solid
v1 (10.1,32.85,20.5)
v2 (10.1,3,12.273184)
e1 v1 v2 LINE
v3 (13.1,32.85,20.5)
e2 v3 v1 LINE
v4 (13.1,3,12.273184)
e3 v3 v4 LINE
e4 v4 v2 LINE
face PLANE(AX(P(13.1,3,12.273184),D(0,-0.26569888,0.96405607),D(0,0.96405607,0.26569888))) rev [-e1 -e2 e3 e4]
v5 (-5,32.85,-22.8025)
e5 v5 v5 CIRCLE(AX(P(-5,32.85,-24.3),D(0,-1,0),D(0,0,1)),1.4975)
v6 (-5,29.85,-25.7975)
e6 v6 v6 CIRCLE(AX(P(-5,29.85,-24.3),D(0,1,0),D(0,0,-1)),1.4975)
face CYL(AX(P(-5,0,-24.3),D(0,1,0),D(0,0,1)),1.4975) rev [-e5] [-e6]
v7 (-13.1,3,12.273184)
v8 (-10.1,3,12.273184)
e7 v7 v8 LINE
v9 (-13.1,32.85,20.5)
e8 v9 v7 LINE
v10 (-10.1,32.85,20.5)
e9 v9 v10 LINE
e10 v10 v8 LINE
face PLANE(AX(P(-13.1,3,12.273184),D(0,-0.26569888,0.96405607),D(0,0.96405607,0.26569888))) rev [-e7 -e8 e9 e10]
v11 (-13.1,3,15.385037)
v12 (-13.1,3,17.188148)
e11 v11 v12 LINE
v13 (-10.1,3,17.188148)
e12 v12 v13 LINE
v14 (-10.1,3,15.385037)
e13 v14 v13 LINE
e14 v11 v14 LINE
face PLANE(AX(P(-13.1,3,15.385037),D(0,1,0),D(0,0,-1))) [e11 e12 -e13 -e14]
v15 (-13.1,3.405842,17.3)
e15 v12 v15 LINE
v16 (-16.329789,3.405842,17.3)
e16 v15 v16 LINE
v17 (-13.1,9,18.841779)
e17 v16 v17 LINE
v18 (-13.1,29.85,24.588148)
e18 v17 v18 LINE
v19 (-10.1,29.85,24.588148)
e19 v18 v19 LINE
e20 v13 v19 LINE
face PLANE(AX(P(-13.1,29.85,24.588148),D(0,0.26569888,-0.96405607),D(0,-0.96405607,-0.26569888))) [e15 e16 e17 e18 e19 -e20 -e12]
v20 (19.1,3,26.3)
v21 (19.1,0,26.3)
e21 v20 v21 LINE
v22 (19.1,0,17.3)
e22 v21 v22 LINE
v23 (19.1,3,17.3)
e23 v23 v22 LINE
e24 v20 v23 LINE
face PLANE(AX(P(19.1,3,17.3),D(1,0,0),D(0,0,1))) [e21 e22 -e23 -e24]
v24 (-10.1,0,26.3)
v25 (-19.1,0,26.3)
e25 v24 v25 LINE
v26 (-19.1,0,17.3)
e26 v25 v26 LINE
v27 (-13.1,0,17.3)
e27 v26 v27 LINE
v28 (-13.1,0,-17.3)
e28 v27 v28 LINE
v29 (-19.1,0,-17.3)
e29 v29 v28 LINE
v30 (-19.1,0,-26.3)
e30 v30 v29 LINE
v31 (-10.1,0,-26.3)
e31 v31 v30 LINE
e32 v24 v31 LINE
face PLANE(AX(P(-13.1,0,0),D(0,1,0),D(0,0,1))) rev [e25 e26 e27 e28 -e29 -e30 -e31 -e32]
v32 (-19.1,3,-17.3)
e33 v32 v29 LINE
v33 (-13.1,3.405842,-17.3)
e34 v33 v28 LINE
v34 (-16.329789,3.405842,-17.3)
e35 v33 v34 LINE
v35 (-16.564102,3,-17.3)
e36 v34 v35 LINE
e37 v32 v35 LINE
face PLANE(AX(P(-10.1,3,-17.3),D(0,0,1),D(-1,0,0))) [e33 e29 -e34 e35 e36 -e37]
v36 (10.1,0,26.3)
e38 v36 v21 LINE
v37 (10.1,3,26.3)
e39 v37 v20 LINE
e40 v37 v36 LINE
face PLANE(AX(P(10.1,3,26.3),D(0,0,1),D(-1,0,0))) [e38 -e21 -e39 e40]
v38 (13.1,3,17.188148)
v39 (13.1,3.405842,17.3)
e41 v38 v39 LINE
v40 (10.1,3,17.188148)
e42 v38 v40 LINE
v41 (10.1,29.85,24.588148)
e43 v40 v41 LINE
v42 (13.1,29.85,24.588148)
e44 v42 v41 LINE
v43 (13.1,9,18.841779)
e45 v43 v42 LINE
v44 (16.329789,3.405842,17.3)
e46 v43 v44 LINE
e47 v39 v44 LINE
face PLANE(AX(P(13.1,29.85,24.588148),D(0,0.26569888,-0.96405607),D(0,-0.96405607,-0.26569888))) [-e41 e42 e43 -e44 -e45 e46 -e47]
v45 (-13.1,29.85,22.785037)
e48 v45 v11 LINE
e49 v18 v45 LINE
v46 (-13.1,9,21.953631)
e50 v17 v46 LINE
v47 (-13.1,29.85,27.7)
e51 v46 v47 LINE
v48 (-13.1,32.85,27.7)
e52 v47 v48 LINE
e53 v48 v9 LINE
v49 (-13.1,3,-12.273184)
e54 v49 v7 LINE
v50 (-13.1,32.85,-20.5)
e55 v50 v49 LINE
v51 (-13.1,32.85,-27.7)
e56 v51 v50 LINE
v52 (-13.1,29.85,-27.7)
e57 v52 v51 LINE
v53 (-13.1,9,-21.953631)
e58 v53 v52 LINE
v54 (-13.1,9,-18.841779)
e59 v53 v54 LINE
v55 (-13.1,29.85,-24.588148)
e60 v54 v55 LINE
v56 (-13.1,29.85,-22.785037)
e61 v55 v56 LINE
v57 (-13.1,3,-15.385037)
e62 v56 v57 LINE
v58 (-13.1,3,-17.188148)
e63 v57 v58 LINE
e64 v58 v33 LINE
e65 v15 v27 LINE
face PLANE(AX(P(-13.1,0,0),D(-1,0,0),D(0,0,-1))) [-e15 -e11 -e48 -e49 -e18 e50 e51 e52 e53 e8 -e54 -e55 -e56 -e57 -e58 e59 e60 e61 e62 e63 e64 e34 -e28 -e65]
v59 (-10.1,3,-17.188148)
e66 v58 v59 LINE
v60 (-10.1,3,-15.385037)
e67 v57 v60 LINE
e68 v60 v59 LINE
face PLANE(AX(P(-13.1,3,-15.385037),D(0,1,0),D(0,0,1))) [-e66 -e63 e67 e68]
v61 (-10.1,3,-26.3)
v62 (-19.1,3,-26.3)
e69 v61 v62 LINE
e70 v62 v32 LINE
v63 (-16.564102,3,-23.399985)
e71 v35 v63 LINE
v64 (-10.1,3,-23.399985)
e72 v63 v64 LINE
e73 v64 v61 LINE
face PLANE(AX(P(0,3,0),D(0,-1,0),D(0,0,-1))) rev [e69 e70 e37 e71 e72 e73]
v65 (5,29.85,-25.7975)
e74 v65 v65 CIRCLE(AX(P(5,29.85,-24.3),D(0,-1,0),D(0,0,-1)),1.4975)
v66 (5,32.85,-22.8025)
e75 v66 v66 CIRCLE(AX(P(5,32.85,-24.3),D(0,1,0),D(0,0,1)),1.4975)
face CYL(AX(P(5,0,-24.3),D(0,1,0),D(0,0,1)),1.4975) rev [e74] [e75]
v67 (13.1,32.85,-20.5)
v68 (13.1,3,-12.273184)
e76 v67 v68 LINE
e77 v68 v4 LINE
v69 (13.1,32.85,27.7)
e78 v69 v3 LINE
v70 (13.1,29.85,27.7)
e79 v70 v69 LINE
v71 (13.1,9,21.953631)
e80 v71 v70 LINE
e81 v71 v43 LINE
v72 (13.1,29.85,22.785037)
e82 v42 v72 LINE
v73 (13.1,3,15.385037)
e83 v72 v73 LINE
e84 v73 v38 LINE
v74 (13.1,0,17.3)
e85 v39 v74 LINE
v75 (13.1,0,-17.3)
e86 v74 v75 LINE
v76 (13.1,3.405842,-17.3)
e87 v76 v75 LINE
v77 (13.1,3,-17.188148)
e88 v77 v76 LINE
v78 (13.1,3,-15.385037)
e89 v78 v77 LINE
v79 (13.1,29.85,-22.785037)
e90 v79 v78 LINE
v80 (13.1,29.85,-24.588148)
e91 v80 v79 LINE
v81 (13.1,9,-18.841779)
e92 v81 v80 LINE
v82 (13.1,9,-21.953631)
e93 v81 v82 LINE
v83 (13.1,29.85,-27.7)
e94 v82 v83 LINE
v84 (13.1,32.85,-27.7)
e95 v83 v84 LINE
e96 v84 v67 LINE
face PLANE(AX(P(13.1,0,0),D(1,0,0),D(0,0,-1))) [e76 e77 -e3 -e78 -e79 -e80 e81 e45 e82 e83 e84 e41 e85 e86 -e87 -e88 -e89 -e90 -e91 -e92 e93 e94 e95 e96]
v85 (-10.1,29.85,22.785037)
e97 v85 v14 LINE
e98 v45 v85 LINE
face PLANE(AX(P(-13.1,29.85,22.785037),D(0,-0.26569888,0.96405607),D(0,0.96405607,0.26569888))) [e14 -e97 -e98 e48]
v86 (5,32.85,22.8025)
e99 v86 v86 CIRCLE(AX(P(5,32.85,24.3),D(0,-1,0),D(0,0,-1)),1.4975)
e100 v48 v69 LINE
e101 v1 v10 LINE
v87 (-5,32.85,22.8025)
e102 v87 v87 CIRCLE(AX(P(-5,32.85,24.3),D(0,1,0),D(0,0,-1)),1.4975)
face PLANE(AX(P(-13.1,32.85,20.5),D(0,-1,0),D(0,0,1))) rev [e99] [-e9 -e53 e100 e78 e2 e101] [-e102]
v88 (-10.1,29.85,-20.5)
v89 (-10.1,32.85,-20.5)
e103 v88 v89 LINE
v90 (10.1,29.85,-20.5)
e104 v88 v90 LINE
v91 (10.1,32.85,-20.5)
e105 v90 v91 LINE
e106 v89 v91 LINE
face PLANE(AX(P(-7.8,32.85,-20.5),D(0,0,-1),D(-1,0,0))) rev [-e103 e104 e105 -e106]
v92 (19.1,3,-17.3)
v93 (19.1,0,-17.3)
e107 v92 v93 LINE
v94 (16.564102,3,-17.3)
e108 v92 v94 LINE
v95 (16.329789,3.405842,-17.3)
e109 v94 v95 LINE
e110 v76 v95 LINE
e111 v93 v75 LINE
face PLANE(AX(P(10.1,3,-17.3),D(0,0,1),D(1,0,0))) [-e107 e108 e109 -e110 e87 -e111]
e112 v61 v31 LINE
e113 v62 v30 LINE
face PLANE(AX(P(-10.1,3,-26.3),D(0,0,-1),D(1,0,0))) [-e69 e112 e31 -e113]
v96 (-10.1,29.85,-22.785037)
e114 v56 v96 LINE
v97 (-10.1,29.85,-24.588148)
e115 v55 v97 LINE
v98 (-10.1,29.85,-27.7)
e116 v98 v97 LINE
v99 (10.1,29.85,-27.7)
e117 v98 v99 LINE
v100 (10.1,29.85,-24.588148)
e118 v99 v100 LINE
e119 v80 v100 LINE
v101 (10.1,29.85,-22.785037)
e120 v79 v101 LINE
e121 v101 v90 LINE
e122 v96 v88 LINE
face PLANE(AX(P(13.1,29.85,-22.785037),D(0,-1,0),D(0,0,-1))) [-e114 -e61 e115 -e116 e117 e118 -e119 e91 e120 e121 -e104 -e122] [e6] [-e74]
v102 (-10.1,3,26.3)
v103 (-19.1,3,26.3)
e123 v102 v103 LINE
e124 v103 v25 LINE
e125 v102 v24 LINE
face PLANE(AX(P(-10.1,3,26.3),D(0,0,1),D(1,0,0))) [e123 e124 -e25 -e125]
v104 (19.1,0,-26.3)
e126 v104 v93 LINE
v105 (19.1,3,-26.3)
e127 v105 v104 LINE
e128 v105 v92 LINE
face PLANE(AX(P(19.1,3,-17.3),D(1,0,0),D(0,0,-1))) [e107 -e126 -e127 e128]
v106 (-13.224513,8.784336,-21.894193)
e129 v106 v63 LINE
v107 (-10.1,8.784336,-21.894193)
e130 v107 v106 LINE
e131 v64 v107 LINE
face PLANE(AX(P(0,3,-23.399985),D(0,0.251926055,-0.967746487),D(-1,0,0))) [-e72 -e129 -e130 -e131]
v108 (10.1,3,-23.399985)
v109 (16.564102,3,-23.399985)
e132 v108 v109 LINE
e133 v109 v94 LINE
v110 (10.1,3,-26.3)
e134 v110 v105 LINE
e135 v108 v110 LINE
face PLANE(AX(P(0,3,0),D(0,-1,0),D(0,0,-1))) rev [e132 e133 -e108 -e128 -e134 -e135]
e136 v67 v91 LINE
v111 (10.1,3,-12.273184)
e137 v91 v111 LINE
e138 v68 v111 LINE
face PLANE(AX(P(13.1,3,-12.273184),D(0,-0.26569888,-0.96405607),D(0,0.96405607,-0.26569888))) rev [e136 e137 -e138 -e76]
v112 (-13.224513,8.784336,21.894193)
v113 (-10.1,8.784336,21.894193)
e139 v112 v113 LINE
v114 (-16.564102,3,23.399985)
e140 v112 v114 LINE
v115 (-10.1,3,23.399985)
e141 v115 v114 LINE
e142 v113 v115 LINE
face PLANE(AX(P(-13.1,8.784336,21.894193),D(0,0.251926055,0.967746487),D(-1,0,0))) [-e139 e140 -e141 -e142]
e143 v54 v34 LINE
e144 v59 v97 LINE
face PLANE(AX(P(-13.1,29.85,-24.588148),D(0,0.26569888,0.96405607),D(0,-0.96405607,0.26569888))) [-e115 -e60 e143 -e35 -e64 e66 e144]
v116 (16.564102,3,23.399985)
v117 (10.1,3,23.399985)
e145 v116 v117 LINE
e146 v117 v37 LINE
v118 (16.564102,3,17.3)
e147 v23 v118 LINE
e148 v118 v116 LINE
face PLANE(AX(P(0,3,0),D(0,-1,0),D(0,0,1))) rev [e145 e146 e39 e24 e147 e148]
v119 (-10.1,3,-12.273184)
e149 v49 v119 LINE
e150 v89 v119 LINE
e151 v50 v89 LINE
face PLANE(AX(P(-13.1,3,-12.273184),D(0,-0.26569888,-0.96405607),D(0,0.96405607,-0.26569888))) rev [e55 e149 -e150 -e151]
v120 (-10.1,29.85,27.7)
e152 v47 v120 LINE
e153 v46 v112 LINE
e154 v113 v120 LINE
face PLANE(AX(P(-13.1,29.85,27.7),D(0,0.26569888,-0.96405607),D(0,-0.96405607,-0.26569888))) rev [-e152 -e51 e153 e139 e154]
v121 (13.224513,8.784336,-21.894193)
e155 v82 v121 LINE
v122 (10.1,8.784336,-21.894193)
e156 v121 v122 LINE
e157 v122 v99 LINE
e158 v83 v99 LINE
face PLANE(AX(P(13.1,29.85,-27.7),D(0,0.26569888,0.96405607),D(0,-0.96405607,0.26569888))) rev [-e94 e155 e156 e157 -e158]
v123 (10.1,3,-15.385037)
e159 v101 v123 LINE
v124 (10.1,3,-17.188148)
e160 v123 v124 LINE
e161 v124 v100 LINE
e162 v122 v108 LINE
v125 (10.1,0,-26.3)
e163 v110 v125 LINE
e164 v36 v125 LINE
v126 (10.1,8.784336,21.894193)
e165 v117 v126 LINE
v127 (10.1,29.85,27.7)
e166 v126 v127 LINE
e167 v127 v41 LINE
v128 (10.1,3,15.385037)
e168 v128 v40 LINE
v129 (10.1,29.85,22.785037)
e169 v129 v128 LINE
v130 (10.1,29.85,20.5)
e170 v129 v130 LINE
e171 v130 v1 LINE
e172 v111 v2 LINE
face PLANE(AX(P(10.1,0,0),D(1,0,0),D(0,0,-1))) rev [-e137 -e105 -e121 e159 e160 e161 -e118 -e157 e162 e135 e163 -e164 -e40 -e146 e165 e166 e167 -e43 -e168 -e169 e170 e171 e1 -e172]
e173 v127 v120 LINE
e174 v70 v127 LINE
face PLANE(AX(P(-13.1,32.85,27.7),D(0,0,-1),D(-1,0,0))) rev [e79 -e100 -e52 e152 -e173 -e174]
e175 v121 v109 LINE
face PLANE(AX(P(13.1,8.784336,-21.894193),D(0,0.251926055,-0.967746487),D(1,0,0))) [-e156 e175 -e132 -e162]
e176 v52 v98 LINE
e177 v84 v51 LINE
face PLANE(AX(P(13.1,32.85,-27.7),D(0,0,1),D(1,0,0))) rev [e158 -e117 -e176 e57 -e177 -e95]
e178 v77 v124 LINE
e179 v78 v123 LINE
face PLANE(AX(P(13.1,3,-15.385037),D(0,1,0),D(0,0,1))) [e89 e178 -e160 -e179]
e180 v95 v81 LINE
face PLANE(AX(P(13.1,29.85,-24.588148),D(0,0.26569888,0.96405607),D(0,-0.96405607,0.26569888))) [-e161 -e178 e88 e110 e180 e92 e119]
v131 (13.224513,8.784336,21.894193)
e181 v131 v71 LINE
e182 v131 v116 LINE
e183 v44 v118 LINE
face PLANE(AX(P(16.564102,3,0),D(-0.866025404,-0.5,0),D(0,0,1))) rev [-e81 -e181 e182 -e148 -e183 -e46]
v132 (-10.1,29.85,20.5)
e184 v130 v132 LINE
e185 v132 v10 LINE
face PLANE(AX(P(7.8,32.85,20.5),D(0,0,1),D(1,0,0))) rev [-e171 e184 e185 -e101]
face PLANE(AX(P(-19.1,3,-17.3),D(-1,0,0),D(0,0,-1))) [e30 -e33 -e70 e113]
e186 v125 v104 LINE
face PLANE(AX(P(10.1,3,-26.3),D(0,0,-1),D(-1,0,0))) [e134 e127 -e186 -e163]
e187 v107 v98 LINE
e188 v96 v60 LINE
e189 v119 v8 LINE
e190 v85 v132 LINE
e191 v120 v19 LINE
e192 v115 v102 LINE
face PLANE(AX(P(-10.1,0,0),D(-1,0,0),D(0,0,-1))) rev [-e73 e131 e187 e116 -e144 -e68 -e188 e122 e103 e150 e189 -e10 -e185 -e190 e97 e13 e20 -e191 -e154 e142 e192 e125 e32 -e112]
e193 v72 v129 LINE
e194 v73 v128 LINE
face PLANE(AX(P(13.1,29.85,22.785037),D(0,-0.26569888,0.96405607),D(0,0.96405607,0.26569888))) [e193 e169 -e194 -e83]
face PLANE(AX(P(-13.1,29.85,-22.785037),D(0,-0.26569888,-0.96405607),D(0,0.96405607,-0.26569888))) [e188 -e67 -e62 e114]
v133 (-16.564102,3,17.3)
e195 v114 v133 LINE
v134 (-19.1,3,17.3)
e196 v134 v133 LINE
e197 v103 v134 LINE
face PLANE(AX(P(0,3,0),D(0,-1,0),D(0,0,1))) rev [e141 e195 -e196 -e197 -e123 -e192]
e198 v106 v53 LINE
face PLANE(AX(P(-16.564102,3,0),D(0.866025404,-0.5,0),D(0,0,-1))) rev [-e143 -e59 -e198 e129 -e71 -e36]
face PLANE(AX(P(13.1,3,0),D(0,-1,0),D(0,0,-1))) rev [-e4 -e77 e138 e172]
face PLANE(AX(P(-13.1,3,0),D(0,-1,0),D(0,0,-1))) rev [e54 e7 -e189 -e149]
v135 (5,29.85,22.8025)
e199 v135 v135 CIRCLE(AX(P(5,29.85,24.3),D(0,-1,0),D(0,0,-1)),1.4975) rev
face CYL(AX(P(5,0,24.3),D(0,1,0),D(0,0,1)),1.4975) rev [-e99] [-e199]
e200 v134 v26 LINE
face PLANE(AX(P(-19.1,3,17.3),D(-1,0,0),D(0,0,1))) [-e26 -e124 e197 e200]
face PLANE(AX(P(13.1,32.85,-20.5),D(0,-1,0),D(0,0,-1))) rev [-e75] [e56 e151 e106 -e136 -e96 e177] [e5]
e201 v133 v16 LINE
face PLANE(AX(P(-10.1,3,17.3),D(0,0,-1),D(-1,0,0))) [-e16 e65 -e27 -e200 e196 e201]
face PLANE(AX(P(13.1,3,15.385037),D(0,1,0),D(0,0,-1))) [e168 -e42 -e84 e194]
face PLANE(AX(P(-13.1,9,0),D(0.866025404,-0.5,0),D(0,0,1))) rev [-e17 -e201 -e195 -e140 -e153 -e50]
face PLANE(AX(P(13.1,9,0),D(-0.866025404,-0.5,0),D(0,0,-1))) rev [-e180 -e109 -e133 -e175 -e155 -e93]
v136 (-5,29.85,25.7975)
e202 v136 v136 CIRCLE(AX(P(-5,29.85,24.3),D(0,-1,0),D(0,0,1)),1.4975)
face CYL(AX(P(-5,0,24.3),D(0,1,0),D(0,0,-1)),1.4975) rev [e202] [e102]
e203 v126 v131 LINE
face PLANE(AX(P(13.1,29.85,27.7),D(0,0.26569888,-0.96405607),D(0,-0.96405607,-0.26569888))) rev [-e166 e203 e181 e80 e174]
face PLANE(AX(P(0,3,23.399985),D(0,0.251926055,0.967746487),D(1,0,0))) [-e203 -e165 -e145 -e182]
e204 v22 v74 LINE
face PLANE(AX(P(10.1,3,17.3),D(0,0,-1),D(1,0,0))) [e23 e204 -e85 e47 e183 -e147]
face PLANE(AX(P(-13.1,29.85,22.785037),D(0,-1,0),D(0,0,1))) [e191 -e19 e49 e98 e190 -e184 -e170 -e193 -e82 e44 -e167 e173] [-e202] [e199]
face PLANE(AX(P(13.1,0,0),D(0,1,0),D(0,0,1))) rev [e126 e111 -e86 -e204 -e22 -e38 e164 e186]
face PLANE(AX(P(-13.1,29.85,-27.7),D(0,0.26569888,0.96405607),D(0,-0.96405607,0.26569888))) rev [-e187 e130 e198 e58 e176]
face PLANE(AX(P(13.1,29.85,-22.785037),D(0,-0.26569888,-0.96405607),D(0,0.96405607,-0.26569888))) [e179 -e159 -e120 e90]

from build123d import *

# Parameters (mm, degrees)
BOSS_EXTRUDE2_DEPTH = 3
SKETCH6_W           = 7.2
SKETCH6_H           = 3
BOSS_EXTRUDE3_DEPTH = 10.1
SKETCH8_R           = 1.4975
CUT_EXTRUDE3_DEPTH  = 45.922405323
SKETCH9_W           = 9
SKETCH9_H           = 9
BOSS_EXTRUDE4_DEPTH = 3
CHAMFER2_SIZE       = 3.464101615
CHAMFER2_SIZE_2     = 6
CHAMFER2_SIZE_3     = 3.099985421


# Read off the part's stored shape, not the designer's step: Mirror10
with BuildPart() as part:
    # Sketch4 → Boss-Extrude2 (new body)
    with BuildSketch(Plane(origin=(10.1, 0, 0), x_dir=(0, 0, -1), z_dir=(1, 0, 0))):
        Polygon((0, 0), (20.3, 0), (20.3, 3), (27.7, 29.85), (27.7, 32.85), (20.5, 32.85), (12.273184358, 3), (0, 3), align=None)
        Polygon((22.785036556, 29.85), (15.385036556, 3), (17.188147801, 3), (24.588147801, 29.85), align=None, mode=Mode.SUBTRACT)
    boss_extrude2 = extrude(amount=BOSS_EXTRUDE2_DEPTH)

    # Sketch6 → Boss-Extrude3 (add)
    with BuildSketch(Plane.ZY.offset(-10.1)):
        with Locations((-24.1, 31.35)):
            Rectangle(SKETCH6_W, SKETCH6_H)
    boss_extrude3 = extrude(amount=BOSS_EXTRUDE3_DEPTH)

    # Sketch8 → Cut-Extrude3 (cut, through all)
    with BuildSketch(Plane(origin=(0, 32.85, 0), x_dir=(1, 0, 0), z_dir=(0, 1, 0))):
        with Locations(Location((5, 24.3, 0), (0, 0, 270))):
            Circle(SKETCH8_R)
    cut_extrude3 = extrude(amount=-CUT_EXTRUDE3_DEPTH, mode=Mode.SUBTRACT)

    # Sketch9 → Boss-Extrude4 (add)
    with BuildSketch(Plane.XZ):
        with Locations((14.6, -21.8)):
            Rectangle(SKETCH9_W, SKETCH9_H)
    boss_extrude4 = extrude(amount=-BOSS_EXTRUDE4_DEPTH)

    # Mirror9: Boss-Extrude2, Boss-Extrude3, Cut-Extrude3, Boss-Extrude4 across plane
    add(boss_extrude2.mirror(Plane(origin=(0, 0, 0), x_dir=(0, 0, 1), z_dir=(1, 0, 0))))
    add(boss_extrude3.mirror(Plane(origin=(0, 0, 0), x_dir=(0, 0, 1), z_dir=(1, 0, 0))))
    add(cut_extrude3.mirror(Plane(origin=(0, 0, 0), x_dir=(0, 0, 1), z_dir=(1, 0, 0))), mode=Mode.SUBTRACT)
    add(boss_extrude4.mirror(Plane(origin=(0, 0, 0), x_dir=(0, 0, 1), z_dir=(1, 0, 0))))

    # Mirror10: part across plane


with BuildPart() as part_1:
    add(part.part)
    add(part.part.mirror(Plane.XY))

    # Chamfer2
    # the kernel refuses this chamfer: 6, 3.464101615, 3.099985421 mm, written as the material it adds along each edge
    with BuildSketch(Plane(origin=(-13.1, 3, 17.3), x_dir=(-0.9983227437537925, -0.05789386240267071, 0), z_dir=(0, 0, 1))) as chamfer2_piece_1_section:
        Polygon((CHAMFER2_SIZE * 0.998322743793, -CHAMFER2_SIZE * 0.057893862405), (-CHAMFER2_SIZE_2 * 0.0578938624027, -CHAMFER2_SIZE_2 * 0.998322743754), (0, 0), align=None)
    chamfer2_piece_1 = extrude(amount=18.522514528, mode=Mode.PRIVATE)
    chamfer2_piece_1 = split(chamfer2_piece_1, bisect_by=Plane(origin=(-14.207429755, 4.623813367, 20.747531431), z_dir=(0, 0.2656988795293601, -0.9640560696436917)), keep=Keep.TOP, mode=Mode.PRIVATE)
    chamfer2_piece_1 = split(chamfer2_piece_1, bisect_by=Plane(origin=(-14.207429755, 5.420910005, 17.855363222), z_dir=(0, -0.26569887952935983, 0.9640560696436918)), keep=Keep.TOP, mode=Mode.PRIVATE)
    add(chamfer2_piece_1)
    with BuildSketch(Plane(origin=(-13.1, 3, -17.3), x_dir=(-0.9983227437537925, -0.05789386240267071, 0), z_dir=(0, 0, -1))) as chamfer2_piece_2_section:
        Polygon((CHAMFER2_SIZE * 0.998322743793, CHAMFER2_SIZE * 0.057893862405), (-CHAMFER2_SIZE_2 * 0.0578938624027, CHAMFER2_SIZE_2 * 0.998322743754), (0, 0), align=None)
    chamfer2_piece_2 = extrude(amount=18.522514528, mode=Mode.PRIVATE)
    chamfer2_piece_2 = split(chamfer2_piece_2, bisect_by=Plane(origin=(-14.207429755, 5.420910005, -17.855363222), z_dir=(0, -0.26569887952935983, -0.9640560696436918)), keep=Keep.TOP, mode=Mode.PRIVATE)
    chamfer2_piece_2 = split(chamfer2_piece_2, bisect_by=Plane(origin=(-14.207429755, 4.623813367, -20.747531431), z_dir=(0, 0.2656988795293601, 0.9640560696436917)), keep=Keep.TOP, mode=Mode.PRIVATE)
    add(chamfer2_piece_2)
    with BuildSketch(Plane(origin=(-10.1, 3, 20.3), x_dir=(0, -0.07329167604498149, 0.997310548536672), z_dir=(-1, 0, 0)), Plane(origin=(10.1, 3, -20.3), x_dir=(0, -0.07329167604498149, -0.997310548536672), z_dir=(1, 0, 0))) as chamfer2_piece_3:
        Polygon((CHAMFER2_SIZE_3 * 0.997310548488, CHAMFER2_SIZE_3 * 0.0732916760414), (CHAMFER2_SIZE_2 * 0.194327010143, CHAMFER2_SIZE_2 * 0.98093680384), (0, 0), align=None)
    extrude(amount=3)
    with BuildSketch(Plane(origin=(13.1, 3, 35.822514528), x_dir=(0.9983227437537925, -0.05789386240267071, 0), z_dir=(0, 0, -1))) as chamfer2_piece_4_section:
        Polygon((CHAMFER2_SIZE * 0.998322743793, -CHAMFER2_SIZE * 0.057893862405), (-CHAMFER2_SIZE_2 * 0.0578938624027, -CHAMFER2_SIZE_2 * 0.998322743754), (0, 0), align=None)
    chamfer2_piece_4 = extrude(amount=18.522514528, mode=Mode.PRIVATE)
    chamfer2_piece_4 = split(chamfer2_piece_4, bisect_by=Plane(origin=(14.207429755, 4.623813367, 20.747531431), z_dir=(0, 0.2656988795293601, -0.9640560696436917)), keep=Keep.TOP, mode=Mode.PRIVATE)
    chamfer2_piece_4 = split(chamfer2_piece_4, bisect_by=Plane(origin=(14.207429755, 5.420910005, 17.855363222), z_dir=(0, -0.26569887952935983, 0.9640560696436918)), keep=Keep.TOP, mode=Mode.PRIVATE)
    add(chamfer2_piece_4)
    with BuildSketch(Plane(origin=(13.1, 3, -35.822514528), x_dir=(0.9983227437537925, -0.05789386240267071, 0), z_dir=(0, 0, 1))) as chamfer2_piece_5_section:
        Polygon((CHAMFER2_SIZE * 0.998322743793, CHAMFER2_SIZE * 0.057893862405), (-CHAMFER2_SIZE_2 * 0.0578938624027, CHAMFER2_SIZE_2 * 0.998322743754), (0, 0), align=None)
    chamfer2_piece_5 = extrude(amount=18.522514528, mode=Mode.PRIVATE)
    chamfer2_piece_5 = split(chamfer2_piece_5, bisect_by=Plane(origin=(14.207429755, 4.623813367, -20.747531431), z_dir=(0, 0.2656988795293601, 0.9640560696436917)), keep=Keep.TOP, mode=Mode.PRIVATE)
    chamfer2_piece_5 = split(chamfer2_piece_5, bisect_by=Plane(origin=(14.207429755, 5.420910005, -17.855363222), z_dir=(0, -0.26569887952935983, -0.9640560696436918)), keep=Keep.TOP, mode=Mode.PRIVATE)
    add(chamfer2_piece_5)
    with BuildSketch(Plane(origin=(10.1, 3, 20.3), x_dir=(0, 0.9690111038190681, 0.24701716676245647), z_dir=(1, 0, 0))) as chamfer2_piece_6:
        Polygon((CHAMFER2_SIZE_2 * 0.999813220622, CHAMFER2_SIZE_2 * 0.0193267656127), (CHAMFER2_SIZE_3 * 0.247017166751, CHAMFER2_SIZE_3 * 0.969011103772), (0, 0), align=None)
    extrude(amount=3)
    with BuildSketch(Plane(origin=(-10.1, 3, -20.3), x_dir=(0, -0.07329167604498149, -0.997310548536672), z_dir=(-1, 0, 0))) as chamfer2_piece_7:
        Polygon((CHAMFER2_SIZE_3 * 0.997310548488, -CHAMFER2_SIZE_3 * 0.0732916760414), (CHAMFER2_SIZE_2 * 0.194327010143, -CHAMFER2_SIZE_2 * 0.98093680384), (0, 0), align=None)
    extrude(amount=3)
    with BuildSketch(Plane(origin=(-13.1, 3, 17.3), x_dir=(-0.9983227437537925, -0.05789386240267071, 0), z_dir=(0, 0, 1))) as chamfer2_piece_8a_section:
        Polygon((CHAMFER2_SIZE * 0.998322743793, -CHAMFER2_SIZE * 0.057893862405), (-CHAMFER2_SIZE_2 * 0.0578938624027, -CHAMFER2_SIZE_2 * 0.998322743754), (0, 0), align=None)
    chamfer2_piece_8a = extrude(amount=18.522514528, mode=Mode.PRIVATE)
    chamfer2_piece_8a = split(chamfer2_piece_8a, bisect_by=Plane(origin=(-14.24841762, 4.892203589, 26.3), z_dir=(0, 0, -1)), keep=Keep.TOP, mode=Mode.PRIVATE)
    chamfer2_piece_8a = split(chamfer2_piece_8a, bisect_by=Plane(origin=(-14.24841762, 5.593858539, 21.014880938), z_dir=(0, -0.2656988795293601, 0.9640560696436917)), keep=Keep.TOP, mode=Mode.PRIVATE)
    with BuildSketch(Plane(origin=(-10.1, 3, 20.3), x_dir=(0, -0.07329167604498149, 0.997310548536672), z_dir=(-1, 0, 0))) as chamfer2_piece_8b_section:
        Polygon((CHAMFER2_SIZE_3 * 0.997310548488, CHAMFER2_SIZE_3 * 0.0732916760414), (CHAMFER2_SIZE_2 * 0.194327010143, CHAMFER2_SIZE_2 * 0.98093680384), (0, 0), align=None)
    chamfer2_piece_8b = extrude(amount=18.522514528, mode=Mode.PRIVATE)
    chamfer2_piece_8b = split(chamfer2_piece_8b, bisect_by=Plane(origin=(-19.1, 4.952235463, 21.823438055), z_dir=(1, 0, 0)), keep=Keep.TOP, mode=Mode.PRIVATE)
    chamfer2_piece_8b = split(chamfer2_piece_8b, bisect_by=Plane(origin=(-13.1, 4.952235463, 21.823438055), z_dir=(-1, 0, 0)), keep=Keep.TOP, mode=Mode.PRIVATE)
    chamfer2_piece_8 = chamfer2_piece_8a & chamfer2_piece_8b
    add(chamfer2_piece_8)
    with BuildSketch(Plane(origin=(-13.1, 3, -17.3), x_dir=(-0.9983227437537925, -0.05789386240267071, 0), z_dir=(0, 0, -1))) as chamfer2_piece_9a_section:
        Polygon((CHAMFER2_SIZE * 0.998322743793, CHAMFER2_SIZE * 0.057893862405), (-CHAMFER2_SIZE_2 * 0.0578938624027, CHAMFER2_SIZE_2 * 0.998322743754), (0, 0), align=None)
    chamfer2_piece_9a = extrude(amount=18.522514528, mode=Mode.PRIVATE)
    chamfer2_piece_9a = split(chamfer2_piece_9a, bisect_by=Plane(origin=(-14.24841762, 4.892203589, -26.3), z_dir=(0, 0, 1)), keep=Keep.TOP, mode=Mode.PRIVATE)
    chamfer2_piece_9a = split(chamfer2_piece_9a, bisect_by=Plane(origin=(-14.24841762, 5.593858539, -21.014880938), z_dir=(0, -0.2656988795293601, -0.9640560696436917)), keep=Keep.TOP, mode=Mode.PRIVATE)
    with BuildSketch(Plane(origin=(-10.1, 3, -20.3), x_dir=(0, -0.07329167604498149, -0.997310548536672), z_dir=(-1, 0, 0))) as chamfer2_piece_9b_section:
        Polygon((CHAMFER2_SIZE_3 * 0.997310548488, -CHAMFER2_SIZE_3 * 0.0732916760414), (CHAMFER2_SIZE_2 * 0.194327010143, -CHAMFER2_SIZE_2 * 0.98093680384), (0, 0), align=None)
    chamfer2_piece_9b = extrude(amount=18.522514528, mode=Mode.PRIVATE)
    chamfer2_piece_9b = split(chamfer2_piece_9b, bisect_by=Plane(origin=(-19.1, 4.952235463, -21.823438055), z_dir=(1, 0, 0)), keep=Keep.TOP, mode=Mode.PRIVATE)
    chamfer2_piece_9b = split(chamfer2_piece_9b, bisect_by=Plane(origin=(-13.1, 4.952235463, -21.823438055), z_dir=(-1, 0, 0)), keep=Keep.TOP, mode=Mode.PRIVATE)
    chamfer2_piece_9 = chamfer2_piece_9a & chamfer2_piece_9b
    add(chamfer2_piece_9)
    with BuildSketch(Plane(origin=(10.1, 3, 20.3), x_dir=(0, 0.9690111038190681, 0.24701716676245647), z_dir=(1, 0, 0))) as chamfer2_piece_10a_section:
        Polygon((CHAMFER2_SIZE_2 * 0.999813220622, CHAMFER2_SIZE_2 * 0.0193267656127), (CHAMFER2_SIZE_3 * 0.247017166751, CHAMFER2_SIZE_3 * 0.969011103772), (0, 0), align=None)
    chamfer2_piece_10a = extrude(amount=18.522514528, mode=Mode.PRIVATE)
    chamfer2_piece_10a = split(chamfer2_piece_10a, bisect_by=Plane(origin=(13.1, 4.952235463, 21.823438055), z_dir=(1, 0, 0)), keep=Keep.TOP, mode=Mode.PRIVATE)
    chamfer2_piece_10a = split(chamfer2_piece_10a, bisect_by=Plane(origin=(19.1, 4.952235463, 21.823438055), z_dir=(-1, 0, 0)), keep=Keep.TOP, mode=Mode.PRIVATE)
    with BuildSketch(Plane(origin=(13.1, 3, 35.822514528), x_dir=(0.9983227437537925, -0.05789386240267071, 0), z_dir=(0, 0, -1))) as chamfer2_piece_10b_section:
        Polygon((CHAMFER2_SIZE * 0.998322743793, -CHAMFER2_SIZE * 0.057893862405), (-CHAMFER2_SIZE_2 * 0.0578938624027, -CHAMFER2_SIZE_2 * 0.998322743754), (0, 0), align=None)
    chamfer2_piece_10b = extrude(amount=18.522514528, mode=Mode.PRIVATE)
    chamfer2_piece_10b = split(chamfer2_piece_10b, bisect_by=Plane(origin=(14.24841762, 5.593858539, 21.014880938), z_dir=(0, -0.2656988795293601, 0.9640560696436917)), keep=Keep.TOP, mode=Mode.PRIVATE)
    chamfer2_piece_10b = split(chamfer2_piece_10b, bisect_by=Plane(origin=(14.24841762, 4.892203589, 26.3), z_dir=(0, 0, -1)), keep=Keep.TOP, mode=Mode.PRIVATE)
    chamfer2_piece_10 = chamfer2_piece_10a & chamfer2_piece_10b
    add(chamfer2_piece_10)
    with BuildSketch(Plane(origin=(13.1, 3, -35.822514528), x_dir=(0.9983227437537925, -0.05789386240267071, 0), z_dir=(0, 0, 1))) as chamfer2_piece_11a_section:
        Polygon((CHAMFER2_SIZE * 0.998322743793, CHAMFER2_SIZE * 0.057893862405), (-CHAMFER2_SIZE_2 * 0.0578938624027, CHAMFER2_SIZE_2 * 0.998322743754), (0, 0), align=None)
    chamfer2_piece_11a = extrude(amount=18.522514528, mode=Mode.PRIVATE)
    chamfer2_piece_11a = split(chamfer2_piece_11a, bisect_by=Plane(origin=(14.24841762, 4.892203589, -26.3), z_dir=(0, 0, 1)), keep=Keep.TOP, mode=Mode.PRIVATE)
    chamfer2_piece_11a = split(chamfer2_piece_11a, bisect_by=Plane(origin=(14.24841762, 5.593858539, -21.014880938), z_dir=(0, -0.2656988795293601, -0.9640560696436917)), keep=Keep.TOP, mode=Mode.PRIVATE)
    with BuildSketch(Plane(origin=(10.1, 3, -20.3), x_dir=(0, -0.07329167604498149, -0.997310548536672), z_dir=(1, 0, 0))) as chamfer2_piece_11b_section:
        Polygon((CHAMFER2_SIZE_3 * 0.997310548488, CHAMFER2_SIZE_3 * 0.0732916760414), (CHAMFER2_SIZE_2 * 0.194327010143, CHAMFER2_SIZE_2 * 0.98093680384), (0, 0), align=None)
    chamfer2_piece_11b = extrude(amount=18.522514528, mode=Mode.PRIVATE)
    chamfer2_piece_11b = split(chamfer2_piece_11b, bisect_by=Plane(origin=(19.1, 4.952235463, -21.823438055), z_dir=(-1, 0, 0)), keep=Keep.TOP, mode=Mode.PRIVATE)
    chamfer2_piece_11b = split(chamfer2_piece_11b, bisect_by=Plane(origin=(13.1, 4.952235463, -21.823438055), z_dir=(1, 0, 0)), keep=Keep.TOP, mode=Mode.PRIVATE)
    chamfer2_piece_11 = chamfer2_piece_11a & chamfer2_piece_11b
    add(chamfer2_piece_11)


solid = part_1.part
